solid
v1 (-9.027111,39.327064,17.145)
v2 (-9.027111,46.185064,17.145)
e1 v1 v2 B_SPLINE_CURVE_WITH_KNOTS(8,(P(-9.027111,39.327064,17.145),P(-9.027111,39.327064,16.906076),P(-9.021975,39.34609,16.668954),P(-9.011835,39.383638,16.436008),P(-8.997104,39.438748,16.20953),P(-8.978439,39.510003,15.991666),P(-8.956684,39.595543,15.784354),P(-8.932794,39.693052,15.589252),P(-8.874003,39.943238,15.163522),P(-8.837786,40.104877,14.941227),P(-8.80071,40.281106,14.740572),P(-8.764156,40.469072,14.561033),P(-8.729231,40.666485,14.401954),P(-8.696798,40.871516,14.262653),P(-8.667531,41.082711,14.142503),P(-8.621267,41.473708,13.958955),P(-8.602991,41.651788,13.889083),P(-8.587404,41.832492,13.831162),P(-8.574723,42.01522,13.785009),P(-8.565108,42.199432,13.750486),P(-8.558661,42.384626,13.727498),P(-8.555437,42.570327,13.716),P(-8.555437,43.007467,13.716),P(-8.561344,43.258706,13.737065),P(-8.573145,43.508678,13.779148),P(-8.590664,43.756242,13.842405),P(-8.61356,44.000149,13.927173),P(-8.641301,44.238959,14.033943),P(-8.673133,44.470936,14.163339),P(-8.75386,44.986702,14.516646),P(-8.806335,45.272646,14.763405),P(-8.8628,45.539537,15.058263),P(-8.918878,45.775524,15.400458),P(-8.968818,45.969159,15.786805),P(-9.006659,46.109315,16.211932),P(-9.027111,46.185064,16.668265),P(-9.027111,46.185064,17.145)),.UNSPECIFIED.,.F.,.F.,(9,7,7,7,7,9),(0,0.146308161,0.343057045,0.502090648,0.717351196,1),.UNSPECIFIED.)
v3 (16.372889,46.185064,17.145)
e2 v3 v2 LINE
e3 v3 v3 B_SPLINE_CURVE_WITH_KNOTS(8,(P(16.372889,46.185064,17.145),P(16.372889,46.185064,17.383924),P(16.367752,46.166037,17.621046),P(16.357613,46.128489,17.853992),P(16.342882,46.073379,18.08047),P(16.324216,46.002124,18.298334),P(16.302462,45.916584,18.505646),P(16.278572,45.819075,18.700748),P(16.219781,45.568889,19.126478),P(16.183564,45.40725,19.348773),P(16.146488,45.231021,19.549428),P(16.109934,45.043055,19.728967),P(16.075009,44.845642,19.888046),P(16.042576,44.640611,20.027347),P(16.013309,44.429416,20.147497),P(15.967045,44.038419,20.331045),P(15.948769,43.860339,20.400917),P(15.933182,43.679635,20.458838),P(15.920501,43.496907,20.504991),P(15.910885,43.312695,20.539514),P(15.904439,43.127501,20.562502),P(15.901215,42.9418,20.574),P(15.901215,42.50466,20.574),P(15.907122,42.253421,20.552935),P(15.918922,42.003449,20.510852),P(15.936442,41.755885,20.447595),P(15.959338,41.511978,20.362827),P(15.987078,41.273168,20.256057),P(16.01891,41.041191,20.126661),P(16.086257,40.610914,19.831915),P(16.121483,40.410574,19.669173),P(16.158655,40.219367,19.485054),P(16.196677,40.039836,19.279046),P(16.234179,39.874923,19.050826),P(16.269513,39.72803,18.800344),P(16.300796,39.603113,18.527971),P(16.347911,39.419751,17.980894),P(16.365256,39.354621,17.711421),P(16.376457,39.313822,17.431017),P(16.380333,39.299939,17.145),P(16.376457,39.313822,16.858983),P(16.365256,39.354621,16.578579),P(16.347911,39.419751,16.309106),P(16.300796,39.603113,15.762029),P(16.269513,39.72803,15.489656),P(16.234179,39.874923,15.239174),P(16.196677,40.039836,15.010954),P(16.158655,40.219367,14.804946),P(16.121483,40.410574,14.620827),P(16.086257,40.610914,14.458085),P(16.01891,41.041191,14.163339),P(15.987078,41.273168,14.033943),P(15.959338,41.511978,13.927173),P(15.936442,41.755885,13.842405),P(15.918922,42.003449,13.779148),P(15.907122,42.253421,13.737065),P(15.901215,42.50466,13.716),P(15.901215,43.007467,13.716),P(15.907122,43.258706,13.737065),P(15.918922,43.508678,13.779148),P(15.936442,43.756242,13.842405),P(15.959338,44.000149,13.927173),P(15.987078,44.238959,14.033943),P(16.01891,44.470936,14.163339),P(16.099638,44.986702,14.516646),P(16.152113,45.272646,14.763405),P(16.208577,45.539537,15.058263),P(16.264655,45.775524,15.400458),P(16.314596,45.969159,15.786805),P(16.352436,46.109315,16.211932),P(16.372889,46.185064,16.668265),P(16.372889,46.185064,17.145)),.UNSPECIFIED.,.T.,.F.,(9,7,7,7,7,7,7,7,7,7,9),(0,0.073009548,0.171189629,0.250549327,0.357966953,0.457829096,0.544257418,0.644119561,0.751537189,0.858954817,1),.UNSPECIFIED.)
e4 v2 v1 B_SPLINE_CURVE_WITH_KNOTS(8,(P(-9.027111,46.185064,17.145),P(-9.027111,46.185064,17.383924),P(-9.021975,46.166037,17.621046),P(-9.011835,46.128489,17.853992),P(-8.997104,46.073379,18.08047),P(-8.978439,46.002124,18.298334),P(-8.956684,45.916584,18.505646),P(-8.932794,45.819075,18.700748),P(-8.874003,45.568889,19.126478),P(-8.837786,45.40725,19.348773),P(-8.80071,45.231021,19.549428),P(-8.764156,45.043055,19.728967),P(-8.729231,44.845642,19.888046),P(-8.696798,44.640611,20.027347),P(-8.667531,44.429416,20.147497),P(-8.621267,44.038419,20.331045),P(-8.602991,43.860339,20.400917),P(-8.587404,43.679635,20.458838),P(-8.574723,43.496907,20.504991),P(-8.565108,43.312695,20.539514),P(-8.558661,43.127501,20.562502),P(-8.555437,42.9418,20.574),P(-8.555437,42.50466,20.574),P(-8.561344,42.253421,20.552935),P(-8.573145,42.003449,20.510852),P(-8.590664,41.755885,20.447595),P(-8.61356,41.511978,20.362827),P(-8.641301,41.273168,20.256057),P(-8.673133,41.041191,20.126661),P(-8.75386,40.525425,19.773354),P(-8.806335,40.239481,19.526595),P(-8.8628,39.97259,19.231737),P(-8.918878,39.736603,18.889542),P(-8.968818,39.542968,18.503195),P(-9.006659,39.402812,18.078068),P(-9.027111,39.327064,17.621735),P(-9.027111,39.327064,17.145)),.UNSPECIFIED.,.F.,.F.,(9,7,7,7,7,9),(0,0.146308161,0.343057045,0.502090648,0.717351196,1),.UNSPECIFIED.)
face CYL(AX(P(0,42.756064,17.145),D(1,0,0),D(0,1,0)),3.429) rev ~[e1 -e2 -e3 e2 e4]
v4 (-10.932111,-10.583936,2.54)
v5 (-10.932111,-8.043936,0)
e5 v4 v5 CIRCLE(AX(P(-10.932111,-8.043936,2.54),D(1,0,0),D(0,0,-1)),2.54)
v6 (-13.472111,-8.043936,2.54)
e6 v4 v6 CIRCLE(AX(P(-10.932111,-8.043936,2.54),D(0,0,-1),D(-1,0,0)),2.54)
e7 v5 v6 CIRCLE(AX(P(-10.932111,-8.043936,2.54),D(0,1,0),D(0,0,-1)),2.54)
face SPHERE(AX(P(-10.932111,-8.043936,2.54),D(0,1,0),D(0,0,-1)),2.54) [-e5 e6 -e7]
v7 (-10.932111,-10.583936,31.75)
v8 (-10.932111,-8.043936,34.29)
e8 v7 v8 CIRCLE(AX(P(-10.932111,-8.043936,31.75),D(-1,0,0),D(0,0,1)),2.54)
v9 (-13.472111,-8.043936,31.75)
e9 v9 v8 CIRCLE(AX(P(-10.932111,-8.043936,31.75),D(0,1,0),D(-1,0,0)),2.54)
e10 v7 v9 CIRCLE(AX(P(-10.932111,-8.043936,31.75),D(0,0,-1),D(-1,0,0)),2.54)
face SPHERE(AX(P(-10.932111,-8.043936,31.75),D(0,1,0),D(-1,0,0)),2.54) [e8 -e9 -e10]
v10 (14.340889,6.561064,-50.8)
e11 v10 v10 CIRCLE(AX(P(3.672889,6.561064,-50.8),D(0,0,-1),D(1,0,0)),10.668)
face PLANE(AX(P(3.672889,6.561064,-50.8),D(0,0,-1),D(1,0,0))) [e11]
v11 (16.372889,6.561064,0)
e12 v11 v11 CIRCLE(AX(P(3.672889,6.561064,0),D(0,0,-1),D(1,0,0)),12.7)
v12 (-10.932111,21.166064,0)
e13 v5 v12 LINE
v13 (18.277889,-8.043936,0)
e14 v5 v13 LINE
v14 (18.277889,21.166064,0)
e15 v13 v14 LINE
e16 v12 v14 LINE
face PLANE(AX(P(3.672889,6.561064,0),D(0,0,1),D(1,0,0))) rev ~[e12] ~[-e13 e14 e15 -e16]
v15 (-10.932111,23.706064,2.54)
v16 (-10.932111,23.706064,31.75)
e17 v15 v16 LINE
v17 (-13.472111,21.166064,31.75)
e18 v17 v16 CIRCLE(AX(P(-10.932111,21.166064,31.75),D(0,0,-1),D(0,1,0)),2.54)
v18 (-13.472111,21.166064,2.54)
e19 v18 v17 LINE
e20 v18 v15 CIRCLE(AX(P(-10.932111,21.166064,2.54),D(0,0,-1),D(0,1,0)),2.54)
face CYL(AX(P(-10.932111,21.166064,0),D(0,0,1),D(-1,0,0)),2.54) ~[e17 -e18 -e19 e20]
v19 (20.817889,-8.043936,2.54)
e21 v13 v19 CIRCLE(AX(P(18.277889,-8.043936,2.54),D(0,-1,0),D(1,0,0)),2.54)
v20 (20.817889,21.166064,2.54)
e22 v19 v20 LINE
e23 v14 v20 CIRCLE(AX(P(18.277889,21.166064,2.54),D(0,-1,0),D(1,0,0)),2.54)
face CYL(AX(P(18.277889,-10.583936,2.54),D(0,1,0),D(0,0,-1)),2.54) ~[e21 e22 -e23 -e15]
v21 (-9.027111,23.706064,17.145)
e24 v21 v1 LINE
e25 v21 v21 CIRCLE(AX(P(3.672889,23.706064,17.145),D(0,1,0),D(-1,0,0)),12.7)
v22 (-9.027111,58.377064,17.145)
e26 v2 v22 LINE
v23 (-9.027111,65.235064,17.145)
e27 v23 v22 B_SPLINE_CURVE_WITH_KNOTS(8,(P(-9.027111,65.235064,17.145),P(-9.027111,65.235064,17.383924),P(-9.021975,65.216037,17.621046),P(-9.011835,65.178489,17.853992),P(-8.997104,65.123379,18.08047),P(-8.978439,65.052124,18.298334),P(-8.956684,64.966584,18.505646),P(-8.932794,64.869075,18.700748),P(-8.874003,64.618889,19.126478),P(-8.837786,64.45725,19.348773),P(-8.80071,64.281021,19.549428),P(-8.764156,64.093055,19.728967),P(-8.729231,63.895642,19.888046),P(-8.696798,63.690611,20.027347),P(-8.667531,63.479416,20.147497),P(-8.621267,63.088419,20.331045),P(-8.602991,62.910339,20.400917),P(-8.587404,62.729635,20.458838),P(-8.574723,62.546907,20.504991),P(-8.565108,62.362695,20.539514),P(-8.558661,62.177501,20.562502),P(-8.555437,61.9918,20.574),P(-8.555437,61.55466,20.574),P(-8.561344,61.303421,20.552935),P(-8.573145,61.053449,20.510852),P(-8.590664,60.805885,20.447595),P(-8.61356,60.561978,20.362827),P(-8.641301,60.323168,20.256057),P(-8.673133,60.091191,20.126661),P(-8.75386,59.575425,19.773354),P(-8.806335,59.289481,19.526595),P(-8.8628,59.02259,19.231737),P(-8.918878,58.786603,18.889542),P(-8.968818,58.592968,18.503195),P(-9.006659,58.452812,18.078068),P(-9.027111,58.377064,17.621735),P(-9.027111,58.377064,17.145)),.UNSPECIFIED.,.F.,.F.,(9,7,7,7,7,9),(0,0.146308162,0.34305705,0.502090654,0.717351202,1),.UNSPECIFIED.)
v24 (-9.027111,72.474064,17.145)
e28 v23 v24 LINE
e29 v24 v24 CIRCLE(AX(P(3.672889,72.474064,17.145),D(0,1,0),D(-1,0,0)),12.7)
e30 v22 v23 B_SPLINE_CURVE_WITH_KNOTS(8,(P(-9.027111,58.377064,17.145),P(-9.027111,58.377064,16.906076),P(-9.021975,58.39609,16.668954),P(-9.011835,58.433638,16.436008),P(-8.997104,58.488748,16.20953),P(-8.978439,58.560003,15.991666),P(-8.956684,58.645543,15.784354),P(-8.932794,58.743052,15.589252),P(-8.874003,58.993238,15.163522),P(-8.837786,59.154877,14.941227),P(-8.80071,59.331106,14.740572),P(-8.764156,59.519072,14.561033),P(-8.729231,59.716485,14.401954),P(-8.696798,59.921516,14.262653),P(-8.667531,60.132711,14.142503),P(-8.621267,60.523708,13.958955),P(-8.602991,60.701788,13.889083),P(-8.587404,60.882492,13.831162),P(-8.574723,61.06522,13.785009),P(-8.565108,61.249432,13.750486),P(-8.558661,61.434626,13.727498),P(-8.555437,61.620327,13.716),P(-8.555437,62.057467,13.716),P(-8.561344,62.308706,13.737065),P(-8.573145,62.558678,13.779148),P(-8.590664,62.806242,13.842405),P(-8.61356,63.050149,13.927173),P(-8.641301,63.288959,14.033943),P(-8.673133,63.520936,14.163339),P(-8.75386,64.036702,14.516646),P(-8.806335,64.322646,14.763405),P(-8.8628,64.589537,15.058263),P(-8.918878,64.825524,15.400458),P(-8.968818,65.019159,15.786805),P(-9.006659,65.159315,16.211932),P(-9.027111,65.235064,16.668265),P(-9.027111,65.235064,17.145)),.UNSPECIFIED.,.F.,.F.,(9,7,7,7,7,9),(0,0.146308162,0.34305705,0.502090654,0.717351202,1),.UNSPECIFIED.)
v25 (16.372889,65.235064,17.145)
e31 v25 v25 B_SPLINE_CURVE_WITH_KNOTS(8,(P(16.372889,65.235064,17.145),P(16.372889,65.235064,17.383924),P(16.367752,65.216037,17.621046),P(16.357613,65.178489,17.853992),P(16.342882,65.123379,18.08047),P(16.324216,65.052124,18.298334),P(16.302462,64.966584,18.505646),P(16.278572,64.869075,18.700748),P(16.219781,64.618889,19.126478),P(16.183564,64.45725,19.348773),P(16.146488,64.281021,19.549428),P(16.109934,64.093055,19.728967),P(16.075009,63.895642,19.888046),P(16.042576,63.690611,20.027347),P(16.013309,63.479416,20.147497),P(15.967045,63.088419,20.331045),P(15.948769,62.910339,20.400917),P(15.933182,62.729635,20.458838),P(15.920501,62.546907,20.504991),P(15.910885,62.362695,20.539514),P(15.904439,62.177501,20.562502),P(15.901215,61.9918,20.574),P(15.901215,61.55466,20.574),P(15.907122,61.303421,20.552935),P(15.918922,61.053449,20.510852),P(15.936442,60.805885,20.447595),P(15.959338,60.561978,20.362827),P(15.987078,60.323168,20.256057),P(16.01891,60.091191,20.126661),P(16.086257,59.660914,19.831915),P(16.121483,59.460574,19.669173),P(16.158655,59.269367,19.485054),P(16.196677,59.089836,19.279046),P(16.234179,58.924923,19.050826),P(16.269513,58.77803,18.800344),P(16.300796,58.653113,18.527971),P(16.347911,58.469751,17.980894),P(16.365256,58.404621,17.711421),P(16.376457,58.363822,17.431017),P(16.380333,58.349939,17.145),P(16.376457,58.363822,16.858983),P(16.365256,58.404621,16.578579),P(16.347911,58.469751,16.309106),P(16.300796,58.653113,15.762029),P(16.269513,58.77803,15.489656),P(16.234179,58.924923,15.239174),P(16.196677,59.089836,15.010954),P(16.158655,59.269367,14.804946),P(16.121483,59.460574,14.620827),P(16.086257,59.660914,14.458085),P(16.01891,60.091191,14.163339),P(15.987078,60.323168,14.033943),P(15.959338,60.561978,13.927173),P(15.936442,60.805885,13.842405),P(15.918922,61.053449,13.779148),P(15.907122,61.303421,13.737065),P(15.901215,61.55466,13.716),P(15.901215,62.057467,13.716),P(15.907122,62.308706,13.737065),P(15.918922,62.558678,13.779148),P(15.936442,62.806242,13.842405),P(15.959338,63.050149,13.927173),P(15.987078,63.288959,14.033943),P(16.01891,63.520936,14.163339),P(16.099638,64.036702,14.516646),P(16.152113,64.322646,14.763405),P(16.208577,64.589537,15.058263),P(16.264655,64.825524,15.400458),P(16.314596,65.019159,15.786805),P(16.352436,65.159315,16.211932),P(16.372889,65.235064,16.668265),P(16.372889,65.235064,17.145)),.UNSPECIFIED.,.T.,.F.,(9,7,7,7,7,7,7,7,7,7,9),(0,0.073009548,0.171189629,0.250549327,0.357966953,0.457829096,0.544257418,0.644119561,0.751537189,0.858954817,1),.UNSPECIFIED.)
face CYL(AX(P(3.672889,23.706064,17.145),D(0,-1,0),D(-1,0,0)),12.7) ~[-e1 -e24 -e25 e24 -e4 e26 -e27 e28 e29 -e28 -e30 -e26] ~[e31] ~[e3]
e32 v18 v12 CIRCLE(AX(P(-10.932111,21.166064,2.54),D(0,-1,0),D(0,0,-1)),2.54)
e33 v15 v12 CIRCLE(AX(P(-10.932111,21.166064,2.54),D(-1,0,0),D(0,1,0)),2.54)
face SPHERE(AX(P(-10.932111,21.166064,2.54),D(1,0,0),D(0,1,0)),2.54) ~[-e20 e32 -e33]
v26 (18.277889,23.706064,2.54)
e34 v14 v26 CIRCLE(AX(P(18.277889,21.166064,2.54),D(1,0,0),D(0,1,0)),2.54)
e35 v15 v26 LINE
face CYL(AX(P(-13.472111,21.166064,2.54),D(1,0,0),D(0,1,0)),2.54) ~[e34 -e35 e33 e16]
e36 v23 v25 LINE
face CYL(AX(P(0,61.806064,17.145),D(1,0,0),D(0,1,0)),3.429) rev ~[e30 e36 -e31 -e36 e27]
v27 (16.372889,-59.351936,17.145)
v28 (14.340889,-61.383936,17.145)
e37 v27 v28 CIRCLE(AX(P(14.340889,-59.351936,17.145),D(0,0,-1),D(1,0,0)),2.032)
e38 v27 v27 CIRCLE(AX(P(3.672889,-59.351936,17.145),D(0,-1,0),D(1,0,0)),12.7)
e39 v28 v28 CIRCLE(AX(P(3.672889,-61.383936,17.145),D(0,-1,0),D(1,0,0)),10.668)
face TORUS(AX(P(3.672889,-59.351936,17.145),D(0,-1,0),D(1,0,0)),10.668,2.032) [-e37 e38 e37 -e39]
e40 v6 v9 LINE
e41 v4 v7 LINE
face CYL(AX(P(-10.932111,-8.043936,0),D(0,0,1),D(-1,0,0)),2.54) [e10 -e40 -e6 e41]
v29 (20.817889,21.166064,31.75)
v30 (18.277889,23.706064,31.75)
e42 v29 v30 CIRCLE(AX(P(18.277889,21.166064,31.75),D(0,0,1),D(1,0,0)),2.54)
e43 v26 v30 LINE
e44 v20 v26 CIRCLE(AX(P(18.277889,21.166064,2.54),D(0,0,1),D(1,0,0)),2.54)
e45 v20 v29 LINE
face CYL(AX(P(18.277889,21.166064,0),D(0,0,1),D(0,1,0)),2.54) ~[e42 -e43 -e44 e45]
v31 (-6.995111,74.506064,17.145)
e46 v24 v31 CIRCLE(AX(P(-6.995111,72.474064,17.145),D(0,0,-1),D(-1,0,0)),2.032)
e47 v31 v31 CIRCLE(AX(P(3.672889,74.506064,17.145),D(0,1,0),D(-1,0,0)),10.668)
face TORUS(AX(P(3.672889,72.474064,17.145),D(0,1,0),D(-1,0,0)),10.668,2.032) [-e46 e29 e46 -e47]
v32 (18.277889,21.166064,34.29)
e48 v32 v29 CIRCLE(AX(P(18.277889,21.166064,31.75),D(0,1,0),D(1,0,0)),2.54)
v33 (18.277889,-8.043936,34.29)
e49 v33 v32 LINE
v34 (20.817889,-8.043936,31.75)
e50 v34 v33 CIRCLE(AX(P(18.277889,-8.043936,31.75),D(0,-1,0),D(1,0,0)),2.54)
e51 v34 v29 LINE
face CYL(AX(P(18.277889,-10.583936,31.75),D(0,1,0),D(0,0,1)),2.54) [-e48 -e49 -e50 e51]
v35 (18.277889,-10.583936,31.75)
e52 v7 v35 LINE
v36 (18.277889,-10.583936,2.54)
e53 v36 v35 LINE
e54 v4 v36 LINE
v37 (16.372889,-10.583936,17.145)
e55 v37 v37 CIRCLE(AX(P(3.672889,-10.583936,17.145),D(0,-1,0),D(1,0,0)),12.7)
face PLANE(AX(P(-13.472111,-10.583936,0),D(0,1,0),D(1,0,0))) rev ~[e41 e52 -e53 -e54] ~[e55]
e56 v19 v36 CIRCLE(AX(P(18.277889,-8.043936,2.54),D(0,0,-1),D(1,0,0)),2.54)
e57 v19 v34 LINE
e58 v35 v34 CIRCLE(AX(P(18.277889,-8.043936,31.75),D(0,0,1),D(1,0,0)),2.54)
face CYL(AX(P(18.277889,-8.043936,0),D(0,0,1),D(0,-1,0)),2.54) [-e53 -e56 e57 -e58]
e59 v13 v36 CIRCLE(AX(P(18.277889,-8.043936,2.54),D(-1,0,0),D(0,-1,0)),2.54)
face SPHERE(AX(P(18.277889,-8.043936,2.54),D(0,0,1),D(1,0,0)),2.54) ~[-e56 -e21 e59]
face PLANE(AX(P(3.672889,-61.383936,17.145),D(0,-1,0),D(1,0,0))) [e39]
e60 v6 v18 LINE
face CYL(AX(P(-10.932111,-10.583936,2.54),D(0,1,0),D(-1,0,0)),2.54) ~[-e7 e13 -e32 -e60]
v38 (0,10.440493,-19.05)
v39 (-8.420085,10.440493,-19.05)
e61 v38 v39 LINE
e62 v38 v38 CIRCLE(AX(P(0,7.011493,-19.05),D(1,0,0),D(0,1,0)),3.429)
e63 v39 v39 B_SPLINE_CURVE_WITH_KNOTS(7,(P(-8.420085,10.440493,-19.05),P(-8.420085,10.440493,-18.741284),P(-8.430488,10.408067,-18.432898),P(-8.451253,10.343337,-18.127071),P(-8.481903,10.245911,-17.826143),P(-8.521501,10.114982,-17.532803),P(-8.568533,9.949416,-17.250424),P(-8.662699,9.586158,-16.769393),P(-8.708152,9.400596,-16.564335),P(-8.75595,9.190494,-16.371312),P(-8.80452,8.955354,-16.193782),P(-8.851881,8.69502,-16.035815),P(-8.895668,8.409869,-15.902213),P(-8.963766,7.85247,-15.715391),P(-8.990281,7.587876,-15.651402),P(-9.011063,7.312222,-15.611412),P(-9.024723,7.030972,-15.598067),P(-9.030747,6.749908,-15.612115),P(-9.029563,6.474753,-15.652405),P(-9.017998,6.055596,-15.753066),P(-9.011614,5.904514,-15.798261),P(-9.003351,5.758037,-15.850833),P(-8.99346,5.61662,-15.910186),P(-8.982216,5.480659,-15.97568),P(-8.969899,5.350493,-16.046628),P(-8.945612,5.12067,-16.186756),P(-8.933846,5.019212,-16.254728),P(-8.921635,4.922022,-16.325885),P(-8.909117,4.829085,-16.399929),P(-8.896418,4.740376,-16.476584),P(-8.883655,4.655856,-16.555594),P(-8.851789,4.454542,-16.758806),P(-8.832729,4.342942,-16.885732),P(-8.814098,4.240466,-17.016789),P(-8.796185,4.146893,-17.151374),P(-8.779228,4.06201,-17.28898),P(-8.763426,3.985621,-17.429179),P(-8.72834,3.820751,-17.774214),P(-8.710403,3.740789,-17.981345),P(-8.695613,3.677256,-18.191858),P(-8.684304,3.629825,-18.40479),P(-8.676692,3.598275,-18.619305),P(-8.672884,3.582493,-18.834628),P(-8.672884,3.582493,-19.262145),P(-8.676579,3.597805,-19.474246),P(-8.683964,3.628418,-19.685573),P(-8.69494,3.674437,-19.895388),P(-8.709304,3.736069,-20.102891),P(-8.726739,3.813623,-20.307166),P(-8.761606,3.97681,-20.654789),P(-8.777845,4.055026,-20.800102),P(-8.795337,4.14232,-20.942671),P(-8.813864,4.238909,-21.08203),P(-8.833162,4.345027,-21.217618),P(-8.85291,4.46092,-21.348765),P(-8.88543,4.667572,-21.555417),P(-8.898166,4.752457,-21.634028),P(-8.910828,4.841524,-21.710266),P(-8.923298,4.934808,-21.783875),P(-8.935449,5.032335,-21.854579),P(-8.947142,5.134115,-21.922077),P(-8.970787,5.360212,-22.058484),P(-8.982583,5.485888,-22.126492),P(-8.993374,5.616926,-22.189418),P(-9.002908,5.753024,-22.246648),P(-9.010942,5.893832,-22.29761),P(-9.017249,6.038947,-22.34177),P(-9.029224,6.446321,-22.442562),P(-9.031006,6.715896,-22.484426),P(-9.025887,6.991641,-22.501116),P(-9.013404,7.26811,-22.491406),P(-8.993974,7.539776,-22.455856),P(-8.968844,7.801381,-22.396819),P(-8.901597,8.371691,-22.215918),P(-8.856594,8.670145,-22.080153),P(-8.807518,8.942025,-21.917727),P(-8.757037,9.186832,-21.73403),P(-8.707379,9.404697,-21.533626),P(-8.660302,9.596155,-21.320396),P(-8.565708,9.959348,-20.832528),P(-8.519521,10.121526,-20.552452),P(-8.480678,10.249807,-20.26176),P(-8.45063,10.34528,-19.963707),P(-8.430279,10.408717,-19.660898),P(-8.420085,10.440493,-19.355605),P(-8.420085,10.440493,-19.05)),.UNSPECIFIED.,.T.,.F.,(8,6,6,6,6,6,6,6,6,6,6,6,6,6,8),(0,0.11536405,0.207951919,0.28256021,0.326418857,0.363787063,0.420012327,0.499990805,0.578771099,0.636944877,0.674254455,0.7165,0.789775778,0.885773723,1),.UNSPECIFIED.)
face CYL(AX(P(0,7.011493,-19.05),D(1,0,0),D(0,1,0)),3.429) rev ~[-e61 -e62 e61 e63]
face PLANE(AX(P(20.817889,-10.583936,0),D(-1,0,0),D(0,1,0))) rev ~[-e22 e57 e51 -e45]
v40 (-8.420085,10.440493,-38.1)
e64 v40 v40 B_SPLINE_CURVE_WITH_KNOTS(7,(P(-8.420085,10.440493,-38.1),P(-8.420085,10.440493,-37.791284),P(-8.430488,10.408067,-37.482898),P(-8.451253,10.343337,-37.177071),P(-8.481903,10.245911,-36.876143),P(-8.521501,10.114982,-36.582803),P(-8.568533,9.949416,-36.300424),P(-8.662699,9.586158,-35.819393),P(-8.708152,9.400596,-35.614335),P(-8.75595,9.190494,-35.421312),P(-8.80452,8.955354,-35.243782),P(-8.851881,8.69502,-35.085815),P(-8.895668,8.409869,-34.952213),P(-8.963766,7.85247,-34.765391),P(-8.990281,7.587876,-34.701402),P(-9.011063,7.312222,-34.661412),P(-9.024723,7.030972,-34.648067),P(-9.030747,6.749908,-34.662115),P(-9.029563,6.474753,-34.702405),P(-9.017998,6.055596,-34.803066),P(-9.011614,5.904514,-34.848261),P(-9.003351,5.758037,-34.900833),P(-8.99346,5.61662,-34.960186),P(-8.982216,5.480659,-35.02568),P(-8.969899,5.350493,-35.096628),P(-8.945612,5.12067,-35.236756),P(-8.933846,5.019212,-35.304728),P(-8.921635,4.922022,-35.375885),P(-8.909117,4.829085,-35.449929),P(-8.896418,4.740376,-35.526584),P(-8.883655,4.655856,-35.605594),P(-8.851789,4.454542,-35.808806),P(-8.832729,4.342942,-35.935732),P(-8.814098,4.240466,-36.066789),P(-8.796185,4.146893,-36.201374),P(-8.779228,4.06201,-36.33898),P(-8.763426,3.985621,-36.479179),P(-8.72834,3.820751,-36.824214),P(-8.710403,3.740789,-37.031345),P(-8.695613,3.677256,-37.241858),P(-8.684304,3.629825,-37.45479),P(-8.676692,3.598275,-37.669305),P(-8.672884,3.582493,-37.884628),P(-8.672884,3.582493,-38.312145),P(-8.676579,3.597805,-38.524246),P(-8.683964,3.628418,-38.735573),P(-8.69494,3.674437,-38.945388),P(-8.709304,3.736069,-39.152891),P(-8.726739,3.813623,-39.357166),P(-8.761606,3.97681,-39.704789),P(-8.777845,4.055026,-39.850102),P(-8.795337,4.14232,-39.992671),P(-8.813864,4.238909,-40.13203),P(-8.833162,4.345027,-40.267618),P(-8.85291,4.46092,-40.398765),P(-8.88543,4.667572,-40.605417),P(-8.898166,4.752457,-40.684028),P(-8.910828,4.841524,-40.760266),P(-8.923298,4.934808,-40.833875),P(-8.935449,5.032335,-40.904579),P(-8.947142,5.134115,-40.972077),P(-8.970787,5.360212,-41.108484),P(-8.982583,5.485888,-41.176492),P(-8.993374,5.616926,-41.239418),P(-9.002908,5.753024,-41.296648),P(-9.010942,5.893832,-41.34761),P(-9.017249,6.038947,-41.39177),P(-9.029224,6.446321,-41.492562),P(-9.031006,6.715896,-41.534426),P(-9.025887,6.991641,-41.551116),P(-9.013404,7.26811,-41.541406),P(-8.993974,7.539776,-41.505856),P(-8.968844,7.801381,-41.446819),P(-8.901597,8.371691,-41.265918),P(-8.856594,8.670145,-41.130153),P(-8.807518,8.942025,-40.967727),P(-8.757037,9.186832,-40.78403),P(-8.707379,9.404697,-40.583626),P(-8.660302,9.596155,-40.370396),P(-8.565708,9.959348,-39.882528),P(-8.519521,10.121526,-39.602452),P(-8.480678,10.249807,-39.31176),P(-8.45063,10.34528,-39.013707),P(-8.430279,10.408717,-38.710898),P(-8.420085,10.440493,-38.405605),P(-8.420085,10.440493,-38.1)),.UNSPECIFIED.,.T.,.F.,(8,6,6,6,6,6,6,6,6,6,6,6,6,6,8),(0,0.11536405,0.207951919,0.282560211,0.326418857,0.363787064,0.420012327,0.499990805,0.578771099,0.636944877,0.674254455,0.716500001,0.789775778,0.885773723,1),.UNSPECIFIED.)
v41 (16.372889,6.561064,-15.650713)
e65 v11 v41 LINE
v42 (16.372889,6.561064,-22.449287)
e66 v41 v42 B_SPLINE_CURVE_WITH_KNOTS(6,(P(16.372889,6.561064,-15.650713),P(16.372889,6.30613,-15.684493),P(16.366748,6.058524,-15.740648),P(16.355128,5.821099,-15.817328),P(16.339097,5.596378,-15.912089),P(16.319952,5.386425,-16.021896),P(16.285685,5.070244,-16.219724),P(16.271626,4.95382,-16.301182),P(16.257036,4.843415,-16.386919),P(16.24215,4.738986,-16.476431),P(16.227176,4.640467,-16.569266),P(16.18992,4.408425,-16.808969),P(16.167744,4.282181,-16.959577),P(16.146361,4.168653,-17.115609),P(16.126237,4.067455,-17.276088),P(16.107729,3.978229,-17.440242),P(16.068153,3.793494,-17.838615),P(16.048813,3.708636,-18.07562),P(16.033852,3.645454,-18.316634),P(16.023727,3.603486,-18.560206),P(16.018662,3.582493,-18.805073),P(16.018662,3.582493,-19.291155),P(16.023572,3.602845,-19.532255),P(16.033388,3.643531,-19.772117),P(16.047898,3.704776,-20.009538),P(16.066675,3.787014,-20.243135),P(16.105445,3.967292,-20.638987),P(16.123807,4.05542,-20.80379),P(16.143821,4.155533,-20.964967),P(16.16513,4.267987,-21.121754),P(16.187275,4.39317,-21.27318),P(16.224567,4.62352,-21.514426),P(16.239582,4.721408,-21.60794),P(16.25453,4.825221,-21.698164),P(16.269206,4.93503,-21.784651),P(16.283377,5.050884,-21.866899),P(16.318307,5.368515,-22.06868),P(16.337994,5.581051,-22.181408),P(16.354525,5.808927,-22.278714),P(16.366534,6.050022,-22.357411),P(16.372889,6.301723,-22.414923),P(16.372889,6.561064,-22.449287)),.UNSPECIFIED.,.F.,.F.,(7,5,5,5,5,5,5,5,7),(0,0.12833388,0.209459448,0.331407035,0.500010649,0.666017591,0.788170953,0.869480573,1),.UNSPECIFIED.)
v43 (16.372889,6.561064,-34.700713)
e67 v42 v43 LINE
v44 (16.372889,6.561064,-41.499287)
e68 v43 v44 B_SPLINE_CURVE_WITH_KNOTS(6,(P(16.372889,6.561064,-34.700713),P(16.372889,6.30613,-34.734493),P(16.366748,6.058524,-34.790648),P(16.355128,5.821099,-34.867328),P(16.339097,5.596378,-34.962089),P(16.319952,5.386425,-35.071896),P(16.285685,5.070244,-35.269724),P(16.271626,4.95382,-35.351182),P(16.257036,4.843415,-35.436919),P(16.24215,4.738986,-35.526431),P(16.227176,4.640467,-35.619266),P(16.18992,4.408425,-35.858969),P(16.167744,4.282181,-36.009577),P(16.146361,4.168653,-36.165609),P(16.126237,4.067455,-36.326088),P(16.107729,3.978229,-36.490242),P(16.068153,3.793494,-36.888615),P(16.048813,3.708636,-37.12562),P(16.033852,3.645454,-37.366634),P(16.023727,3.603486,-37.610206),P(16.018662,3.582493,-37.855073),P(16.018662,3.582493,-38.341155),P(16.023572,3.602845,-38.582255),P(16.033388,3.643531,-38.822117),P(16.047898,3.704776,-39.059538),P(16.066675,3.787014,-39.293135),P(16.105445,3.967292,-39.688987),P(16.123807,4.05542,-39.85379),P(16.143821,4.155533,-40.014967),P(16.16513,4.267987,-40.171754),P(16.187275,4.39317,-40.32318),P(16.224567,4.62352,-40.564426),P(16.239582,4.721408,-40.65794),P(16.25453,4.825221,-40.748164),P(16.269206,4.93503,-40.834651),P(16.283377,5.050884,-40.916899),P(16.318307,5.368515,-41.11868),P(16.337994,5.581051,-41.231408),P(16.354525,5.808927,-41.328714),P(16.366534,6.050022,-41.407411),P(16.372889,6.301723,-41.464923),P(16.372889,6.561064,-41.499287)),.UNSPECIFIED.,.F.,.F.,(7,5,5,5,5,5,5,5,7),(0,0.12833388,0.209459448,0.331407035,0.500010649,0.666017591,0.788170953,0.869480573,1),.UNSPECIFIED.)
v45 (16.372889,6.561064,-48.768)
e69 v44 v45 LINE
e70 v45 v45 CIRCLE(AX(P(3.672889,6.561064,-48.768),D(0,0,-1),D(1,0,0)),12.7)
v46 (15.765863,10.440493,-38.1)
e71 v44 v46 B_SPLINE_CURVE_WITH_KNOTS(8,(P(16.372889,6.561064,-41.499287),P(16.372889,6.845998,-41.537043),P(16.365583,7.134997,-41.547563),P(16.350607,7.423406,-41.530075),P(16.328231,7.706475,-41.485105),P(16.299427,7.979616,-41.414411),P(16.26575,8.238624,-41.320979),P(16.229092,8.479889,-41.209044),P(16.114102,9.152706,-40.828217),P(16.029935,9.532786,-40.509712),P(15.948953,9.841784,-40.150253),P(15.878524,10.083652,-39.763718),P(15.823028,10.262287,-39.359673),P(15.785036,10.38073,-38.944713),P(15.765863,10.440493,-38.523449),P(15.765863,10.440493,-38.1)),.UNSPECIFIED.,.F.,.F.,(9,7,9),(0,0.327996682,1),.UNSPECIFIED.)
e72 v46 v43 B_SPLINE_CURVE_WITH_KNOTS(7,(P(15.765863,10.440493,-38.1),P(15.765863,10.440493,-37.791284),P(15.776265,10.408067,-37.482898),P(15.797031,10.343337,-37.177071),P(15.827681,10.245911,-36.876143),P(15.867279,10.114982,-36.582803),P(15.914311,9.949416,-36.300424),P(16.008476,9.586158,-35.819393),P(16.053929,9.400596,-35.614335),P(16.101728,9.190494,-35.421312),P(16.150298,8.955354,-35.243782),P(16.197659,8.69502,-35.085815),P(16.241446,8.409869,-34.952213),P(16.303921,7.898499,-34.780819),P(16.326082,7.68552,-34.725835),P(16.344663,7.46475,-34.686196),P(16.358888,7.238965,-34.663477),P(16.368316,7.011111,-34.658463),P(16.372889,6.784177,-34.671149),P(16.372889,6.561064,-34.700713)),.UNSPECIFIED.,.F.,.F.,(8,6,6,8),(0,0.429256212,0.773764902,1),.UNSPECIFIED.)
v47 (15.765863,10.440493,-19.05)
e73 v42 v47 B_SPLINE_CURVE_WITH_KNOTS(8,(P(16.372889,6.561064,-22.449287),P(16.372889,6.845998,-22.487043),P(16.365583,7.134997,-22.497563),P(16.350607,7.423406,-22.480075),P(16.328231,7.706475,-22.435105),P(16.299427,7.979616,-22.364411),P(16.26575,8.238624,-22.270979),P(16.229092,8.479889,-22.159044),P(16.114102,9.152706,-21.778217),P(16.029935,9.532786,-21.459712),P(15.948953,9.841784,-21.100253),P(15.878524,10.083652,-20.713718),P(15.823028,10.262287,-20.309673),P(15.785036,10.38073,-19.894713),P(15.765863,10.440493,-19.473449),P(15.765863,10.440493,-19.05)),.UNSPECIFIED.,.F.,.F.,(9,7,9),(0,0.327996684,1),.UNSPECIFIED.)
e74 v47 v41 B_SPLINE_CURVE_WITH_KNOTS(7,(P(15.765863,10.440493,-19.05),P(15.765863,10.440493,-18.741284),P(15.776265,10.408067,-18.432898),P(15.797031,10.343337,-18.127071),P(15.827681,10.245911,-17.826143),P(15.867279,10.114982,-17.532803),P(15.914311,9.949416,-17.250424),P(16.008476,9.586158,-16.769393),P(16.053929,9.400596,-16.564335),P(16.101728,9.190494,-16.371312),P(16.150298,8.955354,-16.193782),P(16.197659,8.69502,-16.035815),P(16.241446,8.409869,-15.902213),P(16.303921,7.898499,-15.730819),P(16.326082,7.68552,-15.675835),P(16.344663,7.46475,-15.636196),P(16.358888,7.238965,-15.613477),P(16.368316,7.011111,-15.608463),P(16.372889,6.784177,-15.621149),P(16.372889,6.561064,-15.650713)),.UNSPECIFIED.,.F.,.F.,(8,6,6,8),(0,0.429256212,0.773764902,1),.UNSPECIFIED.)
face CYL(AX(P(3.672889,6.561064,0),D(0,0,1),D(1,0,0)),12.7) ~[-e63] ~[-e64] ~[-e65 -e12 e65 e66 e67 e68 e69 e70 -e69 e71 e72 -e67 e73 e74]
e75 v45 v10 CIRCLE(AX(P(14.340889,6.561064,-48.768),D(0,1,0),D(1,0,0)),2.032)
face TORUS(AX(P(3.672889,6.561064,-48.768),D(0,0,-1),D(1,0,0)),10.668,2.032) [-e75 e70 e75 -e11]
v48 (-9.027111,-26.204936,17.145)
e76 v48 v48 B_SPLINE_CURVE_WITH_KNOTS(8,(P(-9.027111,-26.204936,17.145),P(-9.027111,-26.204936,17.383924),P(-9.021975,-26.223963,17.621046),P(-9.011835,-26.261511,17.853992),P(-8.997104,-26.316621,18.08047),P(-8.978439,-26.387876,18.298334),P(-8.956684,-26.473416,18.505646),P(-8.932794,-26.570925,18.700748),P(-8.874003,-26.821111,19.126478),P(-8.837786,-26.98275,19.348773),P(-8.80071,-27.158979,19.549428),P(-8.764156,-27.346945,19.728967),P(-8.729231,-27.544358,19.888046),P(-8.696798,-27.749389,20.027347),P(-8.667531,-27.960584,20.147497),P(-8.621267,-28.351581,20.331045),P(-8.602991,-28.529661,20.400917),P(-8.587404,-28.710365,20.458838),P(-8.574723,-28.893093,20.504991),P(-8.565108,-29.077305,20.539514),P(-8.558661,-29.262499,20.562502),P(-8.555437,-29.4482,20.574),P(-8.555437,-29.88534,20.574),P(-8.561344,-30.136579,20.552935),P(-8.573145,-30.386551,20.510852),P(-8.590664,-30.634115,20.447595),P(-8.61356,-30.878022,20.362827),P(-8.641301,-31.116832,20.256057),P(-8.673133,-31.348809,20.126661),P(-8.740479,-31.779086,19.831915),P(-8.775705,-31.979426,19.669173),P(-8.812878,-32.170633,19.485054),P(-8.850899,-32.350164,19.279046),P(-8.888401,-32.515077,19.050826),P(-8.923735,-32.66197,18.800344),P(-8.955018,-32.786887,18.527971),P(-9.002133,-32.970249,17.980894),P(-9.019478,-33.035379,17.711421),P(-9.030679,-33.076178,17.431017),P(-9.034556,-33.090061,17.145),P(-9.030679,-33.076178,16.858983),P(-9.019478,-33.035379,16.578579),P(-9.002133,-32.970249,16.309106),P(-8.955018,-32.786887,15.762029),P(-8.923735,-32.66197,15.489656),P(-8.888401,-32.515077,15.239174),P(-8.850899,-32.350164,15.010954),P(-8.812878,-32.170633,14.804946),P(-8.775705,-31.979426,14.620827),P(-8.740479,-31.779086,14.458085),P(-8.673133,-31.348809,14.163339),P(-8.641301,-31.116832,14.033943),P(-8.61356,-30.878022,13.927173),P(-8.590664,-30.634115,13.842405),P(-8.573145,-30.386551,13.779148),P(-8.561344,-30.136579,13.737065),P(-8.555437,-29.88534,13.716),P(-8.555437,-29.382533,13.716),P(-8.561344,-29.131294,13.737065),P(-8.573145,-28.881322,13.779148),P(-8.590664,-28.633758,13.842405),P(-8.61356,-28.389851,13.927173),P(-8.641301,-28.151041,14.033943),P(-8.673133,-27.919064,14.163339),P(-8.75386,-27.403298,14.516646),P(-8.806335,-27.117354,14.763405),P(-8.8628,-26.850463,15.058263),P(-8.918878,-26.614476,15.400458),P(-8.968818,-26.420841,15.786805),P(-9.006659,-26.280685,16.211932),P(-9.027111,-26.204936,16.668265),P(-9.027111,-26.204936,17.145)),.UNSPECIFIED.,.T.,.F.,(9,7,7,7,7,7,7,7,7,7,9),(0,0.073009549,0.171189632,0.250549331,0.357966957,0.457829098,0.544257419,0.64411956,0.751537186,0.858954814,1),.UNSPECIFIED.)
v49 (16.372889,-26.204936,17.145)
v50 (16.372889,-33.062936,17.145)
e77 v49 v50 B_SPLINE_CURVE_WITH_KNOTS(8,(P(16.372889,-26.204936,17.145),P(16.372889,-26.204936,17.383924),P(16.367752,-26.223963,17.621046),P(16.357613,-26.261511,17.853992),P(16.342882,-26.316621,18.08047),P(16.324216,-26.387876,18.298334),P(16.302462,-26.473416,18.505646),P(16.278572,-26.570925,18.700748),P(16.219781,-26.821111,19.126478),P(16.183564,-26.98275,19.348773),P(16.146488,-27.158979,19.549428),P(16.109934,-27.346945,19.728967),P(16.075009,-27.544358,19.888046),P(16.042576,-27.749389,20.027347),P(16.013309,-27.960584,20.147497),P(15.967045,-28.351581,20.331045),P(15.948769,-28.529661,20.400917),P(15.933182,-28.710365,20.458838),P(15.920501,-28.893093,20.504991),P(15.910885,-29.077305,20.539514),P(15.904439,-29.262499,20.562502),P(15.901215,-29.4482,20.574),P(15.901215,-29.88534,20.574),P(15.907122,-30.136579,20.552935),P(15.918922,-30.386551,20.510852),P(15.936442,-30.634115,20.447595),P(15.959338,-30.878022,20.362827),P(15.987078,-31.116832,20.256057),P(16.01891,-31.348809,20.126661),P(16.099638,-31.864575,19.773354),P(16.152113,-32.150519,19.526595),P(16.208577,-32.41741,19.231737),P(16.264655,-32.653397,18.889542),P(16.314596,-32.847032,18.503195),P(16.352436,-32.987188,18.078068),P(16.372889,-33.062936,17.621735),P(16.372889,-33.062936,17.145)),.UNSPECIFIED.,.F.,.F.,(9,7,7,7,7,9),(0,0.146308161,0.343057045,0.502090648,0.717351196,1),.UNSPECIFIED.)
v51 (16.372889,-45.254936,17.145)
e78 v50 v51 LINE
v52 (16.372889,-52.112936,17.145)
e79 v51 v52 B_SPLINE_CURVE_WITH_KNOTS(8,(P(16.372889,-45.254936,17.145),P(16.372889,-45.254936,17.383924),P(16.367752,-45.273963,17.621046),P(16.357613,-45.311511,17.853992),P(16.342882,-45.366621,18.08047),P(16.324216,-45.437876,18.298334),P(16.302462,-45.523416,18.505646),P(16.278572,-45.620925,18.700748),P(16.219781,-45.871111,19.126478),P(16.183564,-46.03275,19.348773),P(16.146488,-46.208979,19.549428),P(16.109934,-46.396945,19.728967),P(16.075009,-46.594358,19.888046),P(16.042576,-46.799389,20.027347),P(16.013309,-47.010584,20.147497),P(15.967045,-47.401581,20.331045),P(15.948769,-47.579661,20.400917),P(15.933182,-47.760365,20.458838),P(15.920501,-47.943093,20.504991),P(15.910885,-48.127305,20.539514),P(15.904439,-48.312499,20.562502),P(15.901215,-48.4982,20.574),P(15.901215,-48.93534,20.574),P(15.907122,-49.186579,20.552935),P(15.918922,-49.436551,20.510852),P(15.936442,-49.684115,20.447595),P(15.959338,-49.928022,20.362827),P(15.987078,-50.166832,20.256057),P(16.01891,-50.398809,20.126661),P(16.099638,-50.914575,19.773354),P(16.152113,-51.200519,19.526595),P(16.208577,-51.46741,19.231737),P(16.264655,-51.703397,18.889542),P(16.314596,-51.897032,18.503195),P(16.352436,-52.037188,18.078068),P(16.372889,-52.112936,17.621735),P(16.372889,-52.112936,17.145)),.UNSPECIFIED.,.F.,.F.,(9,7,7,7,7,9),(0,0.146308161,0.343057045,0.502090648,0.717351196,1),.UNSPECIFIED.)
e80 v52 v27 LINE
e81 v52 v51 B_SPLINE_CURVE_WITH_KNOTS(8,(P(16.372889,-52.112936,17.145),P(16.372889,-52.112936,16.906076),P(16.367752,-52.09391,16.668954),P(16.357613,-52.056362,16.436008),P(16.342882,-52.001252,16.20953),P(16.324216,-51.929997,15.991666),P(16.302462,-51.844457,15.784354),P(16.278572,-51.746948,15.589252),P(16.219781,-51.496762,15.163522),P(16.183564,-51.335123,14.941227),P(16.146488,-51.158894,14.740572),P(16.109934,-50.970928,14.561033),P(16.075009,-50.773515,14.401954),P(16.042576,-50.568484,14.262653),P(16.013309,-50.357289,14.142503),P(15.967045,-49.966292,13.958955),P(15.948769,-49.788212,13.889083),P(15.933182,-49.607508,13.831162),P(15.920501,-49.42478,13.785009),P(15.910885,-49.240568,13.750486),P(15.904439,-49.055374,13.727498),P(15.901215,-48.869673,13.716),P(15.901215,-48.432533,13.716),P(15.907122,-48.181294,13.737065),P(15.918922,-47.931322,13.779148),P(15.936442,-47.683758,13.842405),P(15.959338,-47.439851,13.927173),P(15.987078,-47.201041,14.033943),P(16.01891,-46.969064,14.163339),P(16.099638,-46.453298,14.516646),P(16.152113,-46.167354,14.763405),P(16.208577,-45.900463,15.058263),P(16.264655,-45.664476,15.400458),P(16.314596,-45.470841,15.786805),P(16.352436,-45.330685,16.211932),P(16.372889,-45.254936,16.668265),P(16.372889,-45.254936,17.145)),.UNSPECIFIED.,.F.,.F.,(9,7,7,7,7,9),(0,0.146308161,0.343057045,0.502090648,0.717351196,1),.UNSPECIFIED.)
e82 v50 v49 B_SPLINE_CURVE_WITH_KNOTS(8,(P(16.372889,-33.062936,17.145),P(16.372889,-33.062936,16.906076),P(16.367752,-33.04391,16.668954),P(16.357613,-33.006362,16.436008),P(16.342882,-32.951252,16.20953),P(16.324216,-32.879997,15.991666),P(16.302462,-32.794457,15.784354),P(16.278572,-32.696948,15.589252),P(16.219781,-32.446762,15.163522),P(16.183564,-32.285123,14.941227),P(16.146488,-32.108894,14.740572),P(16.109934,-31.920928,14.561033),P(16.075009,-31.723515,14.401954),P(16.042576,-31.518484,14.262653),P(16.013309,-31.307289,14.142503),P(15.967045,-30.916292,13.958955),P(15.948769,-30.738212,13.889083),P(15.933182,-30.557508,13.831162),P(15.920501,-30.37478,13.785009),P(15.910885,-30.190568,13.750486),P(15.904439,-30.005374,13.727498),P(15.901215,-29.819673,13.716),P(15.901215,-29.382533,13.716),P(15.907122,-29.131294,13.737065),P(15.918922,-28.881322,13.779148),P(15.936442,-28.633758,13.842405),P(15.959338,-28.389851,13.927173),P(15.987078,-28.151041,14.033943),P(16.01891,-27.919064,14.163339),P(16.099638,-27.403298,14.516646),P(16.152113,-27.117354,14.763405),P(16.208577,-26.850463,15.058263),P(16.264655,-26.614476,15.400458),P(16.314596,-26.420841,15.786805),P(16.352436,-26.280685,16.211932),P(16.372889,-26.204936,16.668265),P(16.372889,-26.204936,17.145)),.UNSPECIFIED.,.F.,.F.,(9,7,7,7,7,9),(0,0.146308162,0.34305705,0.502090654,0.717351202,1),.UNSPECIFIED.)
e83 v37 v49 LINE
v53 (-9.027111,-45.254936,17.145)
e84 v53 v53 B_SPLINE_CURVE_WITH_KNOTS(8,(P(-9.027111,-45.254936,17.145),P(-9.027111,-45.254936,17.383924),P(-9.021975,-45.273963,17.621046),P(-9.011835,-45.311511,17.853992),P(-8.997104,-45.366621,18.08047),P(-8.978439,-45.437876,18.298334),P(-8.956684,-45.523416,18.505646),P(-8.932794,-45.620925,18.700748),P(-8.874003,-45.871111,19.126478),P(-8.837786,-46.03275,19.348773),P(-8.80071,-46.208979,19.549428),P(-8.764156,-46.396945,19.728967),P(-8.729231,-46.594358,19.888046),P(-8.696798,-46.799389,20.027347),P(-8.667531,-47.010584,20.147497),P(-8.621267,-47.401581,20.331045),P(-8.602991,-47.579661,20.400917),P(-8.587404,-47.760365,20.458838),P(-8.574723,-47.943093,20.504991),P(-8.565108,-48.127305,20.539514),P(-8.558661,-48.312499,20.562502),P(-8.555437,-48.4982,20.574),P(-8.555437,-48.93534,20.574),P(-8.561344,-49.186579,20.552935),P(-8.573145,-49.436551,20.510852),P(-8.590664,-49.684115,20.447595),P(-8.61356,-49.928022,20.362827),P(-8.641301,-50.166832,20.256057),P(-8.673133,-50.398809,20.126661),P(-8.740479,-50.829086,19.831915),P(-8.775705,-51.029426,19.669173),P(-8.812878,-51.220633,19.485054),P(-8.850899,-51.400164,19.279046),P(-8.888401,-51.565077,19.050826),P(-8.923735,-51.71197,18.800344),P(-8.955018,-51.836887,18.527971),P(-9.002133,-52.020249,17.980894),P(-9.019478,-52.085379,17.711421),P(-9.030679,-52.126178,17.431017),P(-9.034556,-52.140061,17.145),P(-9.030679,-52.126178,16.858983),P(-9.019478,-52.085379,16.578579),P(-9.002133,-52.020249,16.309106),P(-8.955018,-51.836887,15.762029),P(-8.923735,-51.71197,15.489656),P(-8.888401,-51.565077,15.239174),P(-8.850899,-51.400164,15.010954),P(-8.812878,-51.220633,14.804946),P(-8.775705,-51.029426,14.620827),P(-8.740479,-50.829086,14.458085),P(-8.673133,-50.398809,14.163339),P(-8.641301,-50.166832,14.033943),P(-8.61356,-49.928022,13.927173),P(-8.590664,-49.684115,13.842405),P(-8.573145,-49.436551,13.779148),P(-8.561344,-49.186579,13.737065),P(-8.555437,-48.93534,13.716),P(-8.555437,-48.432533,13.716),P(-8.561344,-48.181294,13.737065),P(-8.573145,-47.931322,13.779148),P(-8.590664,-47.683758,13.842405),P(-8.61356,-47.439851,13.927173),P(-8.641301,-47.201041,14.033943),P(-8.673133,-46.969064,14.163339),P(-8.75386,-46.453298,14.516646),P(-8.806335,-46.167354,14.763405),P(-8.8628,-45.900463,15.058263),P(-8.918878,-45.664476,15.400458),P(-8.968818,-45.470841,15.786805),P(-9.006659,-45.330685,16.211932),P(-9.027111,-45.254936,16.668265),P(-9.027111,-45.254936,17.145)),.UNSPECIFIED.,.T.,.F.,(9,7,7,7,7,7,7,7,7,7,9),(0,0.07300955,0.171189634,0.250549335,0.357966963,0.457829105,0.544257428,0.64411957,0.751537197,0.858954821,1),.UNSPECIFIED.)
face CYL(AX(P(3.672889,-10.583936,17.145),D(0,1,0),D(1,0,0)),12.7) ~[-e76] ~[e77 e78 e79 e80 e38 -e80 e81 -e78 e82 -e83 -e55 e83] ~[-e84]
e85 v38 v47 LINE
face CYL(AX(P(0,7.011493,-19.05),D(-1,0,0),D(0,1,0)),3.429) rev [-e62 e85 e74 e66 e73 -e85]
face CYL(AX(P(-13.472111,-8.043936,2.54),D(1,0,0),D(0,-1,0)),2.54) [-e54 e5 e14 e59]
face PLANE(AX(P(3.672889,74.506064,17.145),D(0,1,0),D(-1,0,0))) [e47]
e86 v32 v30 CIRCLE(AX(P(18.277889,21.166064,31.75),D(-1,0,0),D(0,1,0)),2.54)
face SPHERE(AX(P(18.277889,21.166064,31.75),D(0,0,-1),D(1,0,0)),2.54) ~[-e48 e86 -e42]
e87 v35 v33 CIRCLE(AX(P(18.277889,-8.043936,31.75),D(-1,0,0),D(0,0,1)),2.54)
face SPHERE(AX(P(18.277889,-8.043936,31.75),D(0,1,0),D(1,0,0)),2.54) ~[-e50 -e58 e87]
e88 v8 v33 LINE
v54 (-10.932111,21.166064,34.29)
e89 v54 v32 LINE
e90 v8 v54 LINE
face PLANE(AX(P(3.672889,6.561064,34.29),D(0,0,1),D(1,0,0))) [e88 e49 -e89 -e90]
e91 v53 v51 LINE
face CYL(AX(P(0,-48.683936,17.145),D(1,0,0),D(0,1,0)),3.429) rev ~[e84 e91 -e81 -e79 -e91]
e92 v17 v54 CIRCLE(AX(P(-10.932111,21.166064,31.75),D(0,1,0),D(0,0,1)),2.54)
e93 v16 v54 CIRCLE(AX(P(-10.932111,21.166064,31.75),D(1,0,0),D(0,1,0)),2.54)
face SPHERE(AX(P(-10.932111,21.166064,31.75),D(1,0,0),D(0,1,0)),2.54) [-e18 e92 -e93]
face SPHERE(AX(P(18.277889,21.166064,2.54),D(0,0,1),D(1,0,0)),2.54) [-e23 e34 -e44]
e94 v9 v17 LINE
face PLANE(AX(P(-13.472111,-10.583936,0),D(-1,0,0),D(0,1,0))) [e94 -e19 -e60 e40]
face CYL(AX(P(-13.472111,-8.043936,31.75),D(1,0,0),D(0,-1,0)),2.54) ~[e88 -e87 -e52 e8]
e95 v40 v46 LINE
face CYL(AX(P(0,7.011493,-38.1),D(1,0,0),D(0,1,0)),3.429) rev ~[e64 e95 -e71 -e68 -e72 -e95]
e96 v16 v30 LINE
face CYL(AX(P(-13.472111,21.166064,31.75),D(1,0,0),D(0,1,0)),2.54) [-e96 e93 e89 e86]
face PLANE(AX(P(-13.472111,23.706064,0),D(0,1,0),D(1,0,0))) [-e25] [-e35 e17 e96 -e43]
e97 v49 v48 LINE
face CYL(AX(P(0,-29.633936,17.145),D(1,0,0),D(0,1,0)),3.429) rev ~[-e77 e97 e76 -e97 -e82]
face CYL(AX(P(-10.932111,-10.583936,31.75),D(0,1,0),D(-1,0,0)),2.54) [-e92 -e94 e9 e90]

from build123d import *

# Parameters (mm, degrees)
F0_W      = 34.29
F0_H      = 34.29
F1_DEPTH  = 34.29
F2_R      = 12.7
F3_DEPTH  = 50.8
F4_R      = 3.429
F5_DEPTH  = 25.4
F6_R      = 3.429
F7_DEPTH  = 25.4
F8_R      = 3.429
F9_DEPTH  = 25.4
F10_R     = 2.54
F11_R     = 12.7
F12_DEPTH = 50.8
F13_R     = 3.429
F14_DEPTH = 25.4
F15_R     = 3.429
F16_DEPTH = 25.4
F17_R     = 12.7
F18_DEPTH = 50.8
F19_R     = 2.032
F20_R     = 3.429
F21_DEPTH = 25.4


with BuildPart() as f1:
    # F0 (on Top) → F1 (new body)
    with BuildSketch(Plane.XY):
        with Locations((3.6728888822, 6.5610635031)):
            Rectangle(F0_W, F0_H)
    extrude(amount=F1_DEPTH)

    # F2 (on face) → F3 (join)
    with BuildSketch(Plane.XZ.offset(10.5839364969)):
        with Locations((3.6728888822, 17.145)):
            Circle(F2_R)
    extrude(amount=F3_DEPTH)

    # F4 (on Front) → F5 (cut, symmetric)
    with BuildSketch(Plane.XZ):
        with Locations((3.6728888822, 53.34)):
            Circle(F4_R)
        with Locations((3.6728888822, 72.39)):
            Circle(F4_R)
    extrude(amount=F5_DEPTH, both=True, mode=Mode.SUBTRACT)

    # F6 (on Right) → F7 (cut, symmetric)
    with BuildSketch(Plane.YZ):
        with Locations((-29.6339364969, 17.145)):
            Circle(F6_R)
        with Locations((-48.6839364969, 17.145)):
            Circle(F6_R)
    extrude(amount=F7_DEPTH, both=True, mode=Mode.SUBTRACT)

    # F8 (on Front) → F9 (cut, symmetric)
    with BuildSketch(Plane.XZ):
        with Locations((-51.5721111178, 17.145)):
            Circle(F8_R)
        with Locations((-32.5221111178, 17.145)):
            Circle(F8_R)
    extrude(amount=F9_DEPTH, both=True, mode=Mode.SUBTRACT)

    # F10
    f10_edges = [f1.edges().sort_by_distance(p)[0] for p in [
        (20.817889, 23.706064, 17.145),
        (20.817889, 6.561064, 34.29),
        (20.817889, -10.583936, 17.145),
        (20.817889, 6.561064, 0),
        (3.672889, 23.706064, 0),
        (3.672889, 23.706064, 34.29),
        (-13.472111, 23.706064, 17.145),
        (-13.472111, 6.561064, 0),
        (3.672889, -10.583936, 0),
        (-13.472111, 6.561064, 34.29),
        (-13.472111, -10.583936, 17.145),
        (3.672889, -10.583936, 34.29),
    ]]
    fillet(f10_edges, radius=F10_R)

    # F11 (on face) → F12 (join)
    with BuildSketch(Plane(origin=(0, 23.7060635031, 0), x_dir=(-1, 0, 0), z_dir=(0, 1, 0))):
        with Locations((-3.6728888822, 17.145)):
            Circle(F11_R)
    extrude(amount=F12_DEPTH)

    # F13 (on Right) → F14 (cut, symmetric)
    with BuildSketch(Plane.YZ):
        with Locations((42.7560635031, 17.145)):
            Circle(F13_R)
        with Locations((61.8060635031, 17.145)):
            Circle(F13_R)
    extrude(amount=F14_DEPTH, both=True, mode=Mode.SUBTRACT)

    # F15 (on Front) → F16 (cut, symmetric)
    with BuildSketch(Plane.XZ):
        with Locations((58.9178888822, 17.145)):
            Circle(F15_R)
        with Locations((39.8678888822, 17.145)):
            Circle(F15_R)
    extrude(amount=F16_DEPTH, both=True, mode=Mode.SUBTRACT)

    # F17 (on face) → F18 (join)
    with BuildSketch(Plane(origin=(0, 0, 0), x_dir=(1, 0, 0), z_dir=(0, 0, -1))):
        with Locations((3.6728888822, -6.5610635031)):
            Circle(F17_R)
    extrude(amount=F18_DEPTH)

    # F19
    f19_edges = [f1.edges().sort_by_distance(p)[0] for p in [
        (-9.027111, -61.383936, 17.145),
        (16.372889, 74.506064, 17.145),
        (-9.027111, 6.561064, -50.8),
    ]]
    fillet(f19_edges, radius=F19_R)

    # F20 (on Right) → F21 (cut, symmetric)
    with BuildSketch(Plane.YZ):
        with Locations((7.0114927366, -19.05)):
            Circle(F20_R)
        with Locations((7.0114927366, -38.1)):
            Circle(F20_R)
    extrude(amount=F21_DEPTH, both=True, mode=Mode.SUBTRACT)


solid = f1.part
